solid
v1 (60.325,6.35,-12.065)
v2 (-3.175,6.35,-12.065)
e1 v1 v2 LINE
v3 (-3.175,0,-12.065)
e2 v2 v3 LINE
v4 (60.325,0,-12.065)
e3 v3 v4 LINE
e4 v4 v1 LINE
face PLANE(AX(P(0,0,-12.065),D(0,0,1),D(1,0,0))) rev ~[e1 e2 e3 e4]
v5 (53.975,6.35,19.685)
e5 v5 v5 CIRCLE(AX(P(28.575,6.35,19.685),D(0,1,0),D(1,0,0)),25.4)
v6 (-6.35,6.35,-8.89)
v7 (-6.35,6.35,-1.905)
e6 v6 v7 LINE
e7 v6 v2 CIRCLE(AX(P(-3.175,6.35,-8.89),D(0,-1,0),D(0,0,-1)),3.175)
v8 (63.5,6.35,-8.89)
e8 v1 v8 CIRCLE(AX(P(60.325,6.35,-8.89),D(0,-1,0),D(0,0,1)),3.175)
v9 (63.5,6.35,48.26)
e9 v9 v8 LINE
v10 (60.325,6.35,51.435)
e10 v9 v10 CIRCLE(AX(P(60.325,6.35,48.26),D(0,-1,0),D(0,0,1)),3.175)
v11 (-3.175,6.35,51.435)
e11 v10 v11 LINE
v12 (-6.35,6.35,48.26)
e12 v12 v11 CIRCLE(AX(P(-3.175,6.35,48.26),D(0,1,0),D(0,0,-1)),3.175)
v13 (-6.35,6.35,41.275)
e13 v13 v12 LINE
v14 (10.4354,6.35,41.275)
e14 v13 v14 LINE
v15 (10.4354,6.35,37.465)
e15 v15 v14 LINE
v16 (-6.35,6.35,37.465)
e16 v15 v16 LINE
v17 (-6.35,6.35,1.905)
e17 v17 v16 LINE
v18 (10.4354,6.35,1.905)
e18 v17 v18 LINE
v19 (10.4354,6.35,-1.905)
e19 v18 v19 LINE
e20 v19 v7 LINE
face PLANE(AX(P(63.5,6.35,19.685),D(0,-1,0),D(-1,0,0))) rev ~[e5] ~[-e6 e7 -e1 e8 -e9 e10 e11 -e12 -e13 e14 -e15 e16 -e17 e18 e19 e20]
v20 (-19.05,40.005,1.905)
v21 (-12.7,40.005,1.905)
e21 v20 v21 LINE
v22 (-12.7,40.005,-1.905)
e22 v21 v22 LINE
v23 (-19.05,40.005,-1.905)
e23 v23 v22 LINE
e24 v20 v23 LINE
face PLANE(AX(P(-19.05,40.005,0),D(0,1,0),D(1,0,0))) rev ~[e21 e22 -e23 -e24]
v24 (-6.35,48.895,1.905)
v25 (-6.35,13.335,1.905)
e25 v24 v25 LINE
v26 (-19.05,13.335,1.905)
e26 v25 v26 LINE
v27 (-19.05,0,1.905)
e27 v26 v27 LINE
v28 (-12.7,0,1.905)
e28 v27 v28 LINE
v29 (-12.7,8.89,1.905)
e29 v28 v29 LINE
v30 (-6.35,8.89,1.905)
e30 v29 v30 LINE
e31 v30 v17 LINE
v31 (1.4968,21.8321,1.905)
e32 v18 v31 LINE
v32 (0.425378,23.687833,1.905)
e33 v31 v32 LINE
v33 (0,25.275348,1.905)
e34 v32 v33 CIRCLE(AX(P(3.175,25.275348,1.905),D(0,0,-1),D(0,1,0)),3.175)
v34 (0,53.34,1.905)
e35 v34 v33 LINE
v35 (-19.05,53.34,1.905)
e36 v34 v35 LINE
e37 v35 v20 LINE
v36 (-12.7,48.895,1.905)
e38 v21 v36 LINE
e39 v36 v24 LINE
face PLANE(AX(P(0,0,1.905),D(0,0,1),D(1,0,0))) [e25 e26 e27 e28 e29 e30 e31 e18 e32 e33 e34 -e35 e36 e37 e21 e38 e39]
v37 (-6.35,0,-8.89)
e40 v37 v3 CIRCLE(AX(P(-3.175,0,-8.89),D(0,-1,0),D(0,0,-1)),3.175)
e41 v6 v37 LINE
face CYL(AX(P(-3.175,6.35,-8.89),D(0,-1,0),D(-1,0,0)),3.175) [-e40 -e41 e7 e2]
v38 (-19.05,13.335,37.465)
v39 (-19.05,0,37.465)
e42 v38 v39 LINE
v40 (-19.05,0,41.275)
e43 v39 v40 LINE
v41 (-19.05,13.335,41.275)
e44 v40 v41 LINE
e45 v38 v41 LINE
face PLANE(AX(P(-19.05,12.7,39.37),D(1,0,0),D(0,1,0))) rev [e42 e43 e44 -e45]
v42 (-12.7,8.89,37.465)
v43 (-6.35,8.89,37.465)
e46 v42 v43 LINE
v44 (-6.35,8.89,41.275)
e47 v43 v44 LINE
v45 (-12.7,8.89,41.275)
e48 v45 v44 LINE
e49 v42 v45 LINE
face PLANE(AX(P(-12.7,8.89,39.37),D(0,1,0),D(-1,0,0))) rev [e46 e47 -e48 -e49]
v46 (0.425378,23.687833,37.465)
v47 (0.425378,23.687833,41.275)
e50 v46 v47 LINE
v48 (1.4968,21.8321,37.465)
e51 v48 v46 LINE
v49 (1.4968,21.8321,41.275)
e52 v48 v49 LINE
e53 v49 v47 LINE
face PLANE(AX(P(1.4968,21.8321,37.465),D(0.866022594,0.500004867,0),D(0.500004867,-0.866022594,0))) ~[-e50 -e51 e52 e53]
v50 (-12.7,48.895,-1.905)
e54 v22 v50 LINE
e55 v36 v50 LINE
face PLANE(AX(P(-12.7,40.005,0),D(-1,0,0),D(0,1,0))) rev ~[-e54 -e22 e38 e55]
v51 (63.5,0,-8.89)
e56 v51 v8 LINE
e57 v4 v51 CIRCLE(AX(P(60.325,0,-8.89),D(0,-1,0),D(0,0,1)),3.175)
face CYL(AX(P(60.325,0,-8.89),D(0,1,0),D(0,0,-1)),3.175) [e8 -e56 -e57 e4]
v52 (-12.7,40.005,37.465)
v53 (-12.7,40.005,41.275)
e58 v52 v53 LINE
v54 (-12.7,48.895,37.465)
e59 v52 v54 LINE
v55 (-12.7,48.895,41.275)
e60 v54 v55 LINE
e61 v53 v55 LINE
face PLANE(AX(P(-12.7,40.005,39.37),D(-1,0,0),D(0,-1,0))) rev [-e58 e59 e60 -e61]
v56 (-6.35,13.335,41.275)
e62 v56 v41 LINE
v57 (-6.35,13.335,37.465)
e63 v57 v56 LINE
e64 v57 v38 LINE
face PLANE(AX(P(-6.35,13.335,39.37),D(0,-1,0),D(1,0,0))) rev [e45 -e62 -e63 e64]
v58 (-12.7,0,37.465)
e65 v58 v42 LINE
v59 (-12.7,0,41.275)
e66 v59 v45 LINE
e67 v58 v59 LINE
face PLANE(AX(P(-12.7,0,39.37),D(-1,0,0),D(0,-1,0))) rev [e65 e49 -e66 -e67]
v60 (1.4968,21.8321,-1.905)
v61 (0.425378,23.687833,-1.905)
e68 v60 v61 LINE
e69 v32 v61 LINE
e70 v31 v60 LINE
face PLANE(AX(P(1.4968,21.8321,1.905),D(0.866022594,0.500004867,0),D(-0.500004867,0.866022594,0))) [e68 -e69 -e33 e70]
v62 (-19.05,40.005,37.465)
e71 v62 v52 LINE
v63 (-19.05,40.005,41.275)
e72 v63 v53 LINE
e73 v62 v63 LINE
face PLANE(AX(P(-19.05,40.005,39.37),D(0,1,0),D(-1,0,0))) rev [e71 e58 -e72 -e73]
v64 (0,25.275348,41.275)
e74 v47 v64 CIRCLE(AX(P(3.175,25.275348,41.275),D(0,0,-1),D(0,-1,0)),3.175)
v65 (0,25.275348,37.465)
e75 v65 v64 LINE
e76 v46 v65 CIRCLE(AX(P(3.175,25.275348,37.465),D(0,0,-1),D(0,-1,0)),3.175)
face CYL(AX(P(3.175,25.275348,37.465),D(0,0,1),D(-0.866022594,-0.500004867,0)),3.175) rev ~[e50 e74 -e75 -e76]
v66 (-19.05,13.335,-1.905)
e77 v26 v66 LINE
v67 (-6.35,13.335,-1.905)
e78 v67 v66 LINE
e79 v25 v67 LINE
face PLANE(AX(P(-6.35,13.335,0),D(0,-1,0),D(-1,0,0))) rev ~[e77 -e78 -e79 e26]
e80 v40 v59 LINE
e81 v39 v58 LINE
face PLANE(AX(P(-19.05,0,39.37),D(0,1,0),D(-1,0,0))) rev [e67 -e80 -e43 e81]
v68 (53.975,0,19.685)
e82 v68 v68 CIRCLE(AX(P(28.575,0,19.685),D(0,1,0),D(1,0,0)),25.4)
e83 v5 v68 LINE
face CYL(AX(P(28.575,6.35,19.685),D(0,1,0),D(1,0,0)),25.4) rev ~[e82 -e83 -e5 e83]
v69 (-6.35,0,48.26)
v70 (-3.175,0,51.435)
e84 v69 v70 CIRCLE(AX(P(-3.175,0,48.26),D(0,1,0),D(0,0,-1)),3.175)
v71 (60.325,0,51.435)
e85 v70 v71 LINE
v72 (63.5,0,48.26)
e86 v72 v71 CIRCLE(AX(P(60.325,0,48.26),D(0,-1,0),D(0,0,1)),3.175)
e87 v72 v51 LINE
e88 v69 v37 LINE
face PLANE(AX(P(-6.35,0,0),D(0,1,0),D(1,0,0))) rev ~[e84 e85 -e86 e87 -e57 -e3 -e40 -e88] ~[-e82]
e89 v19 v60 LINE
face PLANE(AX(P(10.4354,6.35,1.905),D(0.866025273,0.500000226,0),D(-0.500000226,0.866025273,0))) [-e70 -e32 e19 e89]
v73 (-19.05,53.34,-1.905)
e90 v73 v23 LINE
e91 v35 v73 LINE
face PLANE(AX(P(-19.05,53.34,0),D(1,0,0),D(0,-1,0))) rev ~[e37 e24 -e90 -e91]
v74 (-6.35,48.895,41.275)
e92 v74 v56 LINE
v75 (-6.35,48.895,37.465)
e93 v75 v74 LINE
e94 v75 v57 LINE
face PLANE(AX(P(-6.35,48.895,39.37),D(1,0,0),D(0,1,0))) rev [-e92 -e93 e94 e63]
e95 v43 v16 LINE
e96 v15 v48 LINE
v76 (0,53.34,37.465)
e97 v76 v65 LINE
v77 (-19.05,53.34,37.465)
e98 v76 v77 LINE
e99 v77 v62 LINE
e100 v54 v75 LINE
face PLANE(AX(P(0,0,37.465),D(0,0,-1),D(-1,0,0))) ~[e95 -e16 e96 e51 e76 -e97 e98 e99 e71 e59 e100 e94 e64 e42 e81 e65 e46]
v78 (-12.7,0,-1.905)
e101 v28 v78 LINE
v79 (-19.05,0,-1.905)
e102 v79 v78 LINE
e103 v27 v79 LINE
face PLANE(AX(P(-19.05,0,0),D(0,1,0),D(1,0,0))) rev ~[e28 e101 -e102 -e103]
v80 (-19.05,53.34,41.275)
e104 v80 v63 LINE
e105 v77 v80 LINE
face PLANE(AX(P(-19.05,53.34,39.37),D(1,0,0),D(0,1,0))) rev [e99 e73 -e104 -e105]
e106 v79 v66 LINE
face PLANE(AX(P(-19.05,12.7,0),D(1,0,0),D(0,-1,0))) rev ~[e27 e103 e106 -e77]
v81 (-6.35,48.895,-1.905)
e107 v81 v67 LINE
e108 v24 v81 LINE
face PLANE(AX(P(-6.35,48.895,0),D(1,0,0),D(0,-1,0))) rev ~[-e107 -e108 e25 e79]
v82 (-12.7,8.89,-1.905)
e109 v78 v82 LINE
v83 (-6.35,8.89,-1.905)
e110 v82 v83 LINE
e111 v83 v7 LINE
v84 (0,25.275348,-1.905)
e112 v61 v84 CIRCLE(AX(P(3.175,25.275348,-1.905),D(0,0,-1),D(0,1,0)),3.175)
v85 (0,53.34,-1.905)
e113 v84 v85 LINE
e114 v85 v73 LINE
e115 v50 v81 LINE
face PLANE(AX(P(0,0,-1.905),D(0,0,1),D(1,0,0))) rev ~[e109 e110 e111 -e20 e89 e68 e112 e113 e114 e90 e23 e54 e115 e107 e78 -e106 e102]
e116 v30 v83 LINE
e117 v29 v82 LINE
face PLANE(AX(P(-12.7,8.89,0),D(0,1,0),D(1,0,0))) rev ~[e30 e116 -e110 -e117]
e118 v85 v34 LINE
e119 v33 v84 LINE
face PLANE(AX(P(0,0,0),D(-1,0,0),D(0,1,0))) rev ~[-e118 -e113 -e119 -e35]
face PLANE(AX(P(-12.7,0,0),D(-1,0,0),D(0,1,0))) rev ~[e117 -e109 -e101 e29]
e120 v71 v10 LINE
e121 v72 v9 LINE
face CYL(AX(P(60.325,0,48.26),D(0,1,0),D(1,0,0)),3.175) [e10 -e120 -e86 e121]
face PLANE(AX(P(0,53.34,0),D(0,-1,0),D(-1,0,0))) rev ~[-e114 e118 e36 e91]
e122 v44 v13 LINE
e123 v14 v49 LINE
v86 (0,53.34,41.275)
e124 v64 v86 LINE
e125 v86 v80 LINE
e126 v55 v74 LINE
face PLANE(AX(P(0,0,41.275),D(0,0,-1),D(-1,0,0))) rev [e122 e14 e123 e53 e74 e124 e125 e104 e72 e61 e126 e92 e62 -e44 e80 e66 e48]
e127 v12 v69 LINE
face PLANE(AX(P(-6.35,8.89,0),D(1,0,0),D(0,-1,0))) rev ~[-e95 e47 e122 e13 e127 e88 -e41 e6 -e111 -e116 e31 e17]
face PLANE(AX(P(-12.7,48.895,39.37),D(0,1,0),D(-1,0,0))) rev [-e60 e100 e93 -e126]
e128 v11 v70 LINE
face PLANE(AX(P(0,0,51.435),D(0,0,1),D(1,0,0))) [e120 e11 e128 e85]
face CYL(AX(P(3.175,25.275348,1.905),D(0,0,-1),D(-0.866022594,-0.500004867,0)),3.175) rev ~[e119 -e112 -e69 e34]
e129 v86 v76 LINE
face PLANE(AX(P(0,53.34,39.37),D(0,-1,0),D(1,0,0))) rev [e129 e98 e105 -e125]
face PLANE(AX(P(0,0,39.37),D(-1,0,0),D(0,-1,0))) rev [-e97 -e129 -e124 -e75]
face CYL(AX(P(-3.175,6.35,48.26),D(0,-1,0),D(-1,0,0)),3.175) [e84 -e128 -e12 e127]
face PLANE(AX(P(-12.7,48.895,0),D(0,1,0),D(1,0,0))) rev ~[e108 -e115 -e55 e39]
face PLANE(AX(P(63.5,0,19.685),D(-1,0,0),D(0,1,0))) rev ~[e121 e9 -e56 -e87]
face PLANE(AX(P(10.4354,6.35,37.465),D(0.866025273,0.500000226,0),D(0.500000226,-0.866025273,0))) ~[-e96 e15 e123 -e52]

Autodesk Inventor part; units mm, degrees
ref_plane "YZ Plane" through (0, 0, 0) normal (1, 0, 0) x (0, 1, 0)
ref_plane "XZ Plane" through (0, 0, 0) normal (0, 1, 0) x (-1, 0, 0)
sketch "Sketch1" plane through (0, 0, 0) normal (0, 0, 1) x (1, 0, 0)
  line L0 (0, 6.35) -> (0, 53.34)
  line L1 (0, 53.34) -> (-19.05, 53.34)
  line L2 (-19.05, 53.34) -> (-19.05, 55.245)
  line L3 (-12.7, 48.895) -> (-6.35, 48.895)
  line L4 (-6.35, 48.895) -> (-6.35, 13.335)
  line L5 (-6.35, 13.335) -> (-19.05, 13.335)
  line L6 (-19.05, 13.335) -> (-19.05, 12.7)
  line L7 (-12.7, 8.89) -> (-6.35, 8.89)
  line L8 (-6.35, 8.89) -> (-6.35, 0)
  line L9 (-6.35, 0) -> (0, 0)
  line L10 (-19.05, 55.245) -> (-19.05, 40.005)
  line L11 (-19.05, 40.005) -> (-12.7, 40.005)
  line L12 (-12.7, 40.005) -> (-12.7, 48.895)
  line L13 (-19.05, 12.7) -> (-19.05, 0)
  line L14 (-19.05, 0) -> (-12.7, 0)
  line L15 (-12.7, 0) -> (-12.7, 8.89)
  line L16 (0, 0) -> (0, 6.35)
  line L17 (0, 0) -> (10.16, 0)
  line L18 (10.16, 0) -> (0, 23.7508)
  point P0 (-19.05, 53.34)
  point P1 (-19.05, 11.43)
  dimension "d1" = 35.56
  dimension "d2" = 4.445
  dimension "d3" = 4.445
  dimension "d4" = 6.35
  dimension "d6" = 6.35
  dimension "d7" = 6.35
  dimension "d13" = 13.335
  dimension "d14" = 13.335
  dimension "d35" = 10.16
  dimension "d36" = 66.84
extrude "Extrusion1" add sketch "Sketch1" along normal mid plane 3.81 contours L16 L9 L8 L7 L15 L14 L13 L6 L5 L4 L3 L12 L11 L10 L1 L0
ref_plane "Work Plane1" through (0, 0, 19.685) normal (0, 0, 1) x (1, 0, 0)
mirror "Mirror1" about plane through (0, 0, 19.685) normal (0, 0, 1) of "Extrusion1"
sketch "Sketch4" plane through (0, 0, 19.685) normal (0, 0, 1) x (1, 0, 0)
  line L0 (-6.35, 8.89) -> (-6.35, 0) projected
  line L1 (-6.35, 0) -> (63.5, 0)
  line L2 (63.5, 0) -> (63.5, 6.35)
  line L3 (63.5, 6.35) -> (-6.35, 6.35)
  line L4 (-6.35, 6.35) -> (-6.35, 0)
  point P0 (0, 0)
  dimension "d23" = 69.85
  dimension "d24" = 6.35
extrude "Extrusion4" add sketch "Sketch4" along normal mid plane 63.5
sketch "Sketch5" plane through (-6.35, 6.35, 51.435) normal (0, 1, 0) x (1, 0, 0)
  line L0 (0, 63.5) -> (69.85, 63.5) construction
  line L1 (69.85, 63.5) -> (69.85, 0) construction
  line L2 (0, 0) -> (69.85, 0) construction
  line L3 (0, 0) -> (0, 63.5) construction
  line L4 (0, 63.5) -> (69.85, 0) construction
  line L5 (69.85, 63.5) -> (0, 0) construction
  circle A0 centre (34.925, 31.75) radius 25.4
  point P0 (6.35, 51.435)
  dimension "d32" = 50.8
fillet "Fillet1" radius 3.175 4 edges at (-6.35, 3.175, 51.435) (63.5, 3.175, 51.435) (63.5, 3.175, -12.065) (-6.35, 3.175, -12.065)
extrude "Extrusion6" cut sketch "Sketch5" against normal through all
sketch "Sketch6" plane through (0, 0, 1.905) normal (0, 0, 1) x (1, 0, 0)
  line L0 (-3.175, 6.35) -> (60.325, 6.35) projected
  line L1 (10.4354, 6.35) -> (0, 6.35)
  line L2 (10.4354, 6.35) -> (1.4968, 21.8321)
  line L3 (10.4354, 6.35) -> (28.3126, 6.35) construction
  line L4 (1.4968, 21.8321) -> (0, 24.4246)
  line L5 (0, 53.34) -> (0, 6.35) projected
  line L6 (0, 24.4246) -> (0, 6.35)
  point P0 (0, 0)
  dimension "d37" = 120
extrude "Extrusion7" add sketch "Sketch6" against normal blind 3.81
mirror "Mirror2" about plane through (0, 0, 19.685) normal (0, 0, 1) of "Extrusion7"
fillet "Fillet2" radius 3.175 2 edges at (0, 24.4246, 39.37) (0, 24.4246, 0)
equation "\"d11\" = width"
equation "\"d15\" = oneHalfSpacing"
equation "\"width\" = 3.81"
equation "\"spacing\" = 39.37"
equation "\"oneHalfSpacing\" = 0.5 * spacing"
properties part number "round_2_0_inchHoleV01"
